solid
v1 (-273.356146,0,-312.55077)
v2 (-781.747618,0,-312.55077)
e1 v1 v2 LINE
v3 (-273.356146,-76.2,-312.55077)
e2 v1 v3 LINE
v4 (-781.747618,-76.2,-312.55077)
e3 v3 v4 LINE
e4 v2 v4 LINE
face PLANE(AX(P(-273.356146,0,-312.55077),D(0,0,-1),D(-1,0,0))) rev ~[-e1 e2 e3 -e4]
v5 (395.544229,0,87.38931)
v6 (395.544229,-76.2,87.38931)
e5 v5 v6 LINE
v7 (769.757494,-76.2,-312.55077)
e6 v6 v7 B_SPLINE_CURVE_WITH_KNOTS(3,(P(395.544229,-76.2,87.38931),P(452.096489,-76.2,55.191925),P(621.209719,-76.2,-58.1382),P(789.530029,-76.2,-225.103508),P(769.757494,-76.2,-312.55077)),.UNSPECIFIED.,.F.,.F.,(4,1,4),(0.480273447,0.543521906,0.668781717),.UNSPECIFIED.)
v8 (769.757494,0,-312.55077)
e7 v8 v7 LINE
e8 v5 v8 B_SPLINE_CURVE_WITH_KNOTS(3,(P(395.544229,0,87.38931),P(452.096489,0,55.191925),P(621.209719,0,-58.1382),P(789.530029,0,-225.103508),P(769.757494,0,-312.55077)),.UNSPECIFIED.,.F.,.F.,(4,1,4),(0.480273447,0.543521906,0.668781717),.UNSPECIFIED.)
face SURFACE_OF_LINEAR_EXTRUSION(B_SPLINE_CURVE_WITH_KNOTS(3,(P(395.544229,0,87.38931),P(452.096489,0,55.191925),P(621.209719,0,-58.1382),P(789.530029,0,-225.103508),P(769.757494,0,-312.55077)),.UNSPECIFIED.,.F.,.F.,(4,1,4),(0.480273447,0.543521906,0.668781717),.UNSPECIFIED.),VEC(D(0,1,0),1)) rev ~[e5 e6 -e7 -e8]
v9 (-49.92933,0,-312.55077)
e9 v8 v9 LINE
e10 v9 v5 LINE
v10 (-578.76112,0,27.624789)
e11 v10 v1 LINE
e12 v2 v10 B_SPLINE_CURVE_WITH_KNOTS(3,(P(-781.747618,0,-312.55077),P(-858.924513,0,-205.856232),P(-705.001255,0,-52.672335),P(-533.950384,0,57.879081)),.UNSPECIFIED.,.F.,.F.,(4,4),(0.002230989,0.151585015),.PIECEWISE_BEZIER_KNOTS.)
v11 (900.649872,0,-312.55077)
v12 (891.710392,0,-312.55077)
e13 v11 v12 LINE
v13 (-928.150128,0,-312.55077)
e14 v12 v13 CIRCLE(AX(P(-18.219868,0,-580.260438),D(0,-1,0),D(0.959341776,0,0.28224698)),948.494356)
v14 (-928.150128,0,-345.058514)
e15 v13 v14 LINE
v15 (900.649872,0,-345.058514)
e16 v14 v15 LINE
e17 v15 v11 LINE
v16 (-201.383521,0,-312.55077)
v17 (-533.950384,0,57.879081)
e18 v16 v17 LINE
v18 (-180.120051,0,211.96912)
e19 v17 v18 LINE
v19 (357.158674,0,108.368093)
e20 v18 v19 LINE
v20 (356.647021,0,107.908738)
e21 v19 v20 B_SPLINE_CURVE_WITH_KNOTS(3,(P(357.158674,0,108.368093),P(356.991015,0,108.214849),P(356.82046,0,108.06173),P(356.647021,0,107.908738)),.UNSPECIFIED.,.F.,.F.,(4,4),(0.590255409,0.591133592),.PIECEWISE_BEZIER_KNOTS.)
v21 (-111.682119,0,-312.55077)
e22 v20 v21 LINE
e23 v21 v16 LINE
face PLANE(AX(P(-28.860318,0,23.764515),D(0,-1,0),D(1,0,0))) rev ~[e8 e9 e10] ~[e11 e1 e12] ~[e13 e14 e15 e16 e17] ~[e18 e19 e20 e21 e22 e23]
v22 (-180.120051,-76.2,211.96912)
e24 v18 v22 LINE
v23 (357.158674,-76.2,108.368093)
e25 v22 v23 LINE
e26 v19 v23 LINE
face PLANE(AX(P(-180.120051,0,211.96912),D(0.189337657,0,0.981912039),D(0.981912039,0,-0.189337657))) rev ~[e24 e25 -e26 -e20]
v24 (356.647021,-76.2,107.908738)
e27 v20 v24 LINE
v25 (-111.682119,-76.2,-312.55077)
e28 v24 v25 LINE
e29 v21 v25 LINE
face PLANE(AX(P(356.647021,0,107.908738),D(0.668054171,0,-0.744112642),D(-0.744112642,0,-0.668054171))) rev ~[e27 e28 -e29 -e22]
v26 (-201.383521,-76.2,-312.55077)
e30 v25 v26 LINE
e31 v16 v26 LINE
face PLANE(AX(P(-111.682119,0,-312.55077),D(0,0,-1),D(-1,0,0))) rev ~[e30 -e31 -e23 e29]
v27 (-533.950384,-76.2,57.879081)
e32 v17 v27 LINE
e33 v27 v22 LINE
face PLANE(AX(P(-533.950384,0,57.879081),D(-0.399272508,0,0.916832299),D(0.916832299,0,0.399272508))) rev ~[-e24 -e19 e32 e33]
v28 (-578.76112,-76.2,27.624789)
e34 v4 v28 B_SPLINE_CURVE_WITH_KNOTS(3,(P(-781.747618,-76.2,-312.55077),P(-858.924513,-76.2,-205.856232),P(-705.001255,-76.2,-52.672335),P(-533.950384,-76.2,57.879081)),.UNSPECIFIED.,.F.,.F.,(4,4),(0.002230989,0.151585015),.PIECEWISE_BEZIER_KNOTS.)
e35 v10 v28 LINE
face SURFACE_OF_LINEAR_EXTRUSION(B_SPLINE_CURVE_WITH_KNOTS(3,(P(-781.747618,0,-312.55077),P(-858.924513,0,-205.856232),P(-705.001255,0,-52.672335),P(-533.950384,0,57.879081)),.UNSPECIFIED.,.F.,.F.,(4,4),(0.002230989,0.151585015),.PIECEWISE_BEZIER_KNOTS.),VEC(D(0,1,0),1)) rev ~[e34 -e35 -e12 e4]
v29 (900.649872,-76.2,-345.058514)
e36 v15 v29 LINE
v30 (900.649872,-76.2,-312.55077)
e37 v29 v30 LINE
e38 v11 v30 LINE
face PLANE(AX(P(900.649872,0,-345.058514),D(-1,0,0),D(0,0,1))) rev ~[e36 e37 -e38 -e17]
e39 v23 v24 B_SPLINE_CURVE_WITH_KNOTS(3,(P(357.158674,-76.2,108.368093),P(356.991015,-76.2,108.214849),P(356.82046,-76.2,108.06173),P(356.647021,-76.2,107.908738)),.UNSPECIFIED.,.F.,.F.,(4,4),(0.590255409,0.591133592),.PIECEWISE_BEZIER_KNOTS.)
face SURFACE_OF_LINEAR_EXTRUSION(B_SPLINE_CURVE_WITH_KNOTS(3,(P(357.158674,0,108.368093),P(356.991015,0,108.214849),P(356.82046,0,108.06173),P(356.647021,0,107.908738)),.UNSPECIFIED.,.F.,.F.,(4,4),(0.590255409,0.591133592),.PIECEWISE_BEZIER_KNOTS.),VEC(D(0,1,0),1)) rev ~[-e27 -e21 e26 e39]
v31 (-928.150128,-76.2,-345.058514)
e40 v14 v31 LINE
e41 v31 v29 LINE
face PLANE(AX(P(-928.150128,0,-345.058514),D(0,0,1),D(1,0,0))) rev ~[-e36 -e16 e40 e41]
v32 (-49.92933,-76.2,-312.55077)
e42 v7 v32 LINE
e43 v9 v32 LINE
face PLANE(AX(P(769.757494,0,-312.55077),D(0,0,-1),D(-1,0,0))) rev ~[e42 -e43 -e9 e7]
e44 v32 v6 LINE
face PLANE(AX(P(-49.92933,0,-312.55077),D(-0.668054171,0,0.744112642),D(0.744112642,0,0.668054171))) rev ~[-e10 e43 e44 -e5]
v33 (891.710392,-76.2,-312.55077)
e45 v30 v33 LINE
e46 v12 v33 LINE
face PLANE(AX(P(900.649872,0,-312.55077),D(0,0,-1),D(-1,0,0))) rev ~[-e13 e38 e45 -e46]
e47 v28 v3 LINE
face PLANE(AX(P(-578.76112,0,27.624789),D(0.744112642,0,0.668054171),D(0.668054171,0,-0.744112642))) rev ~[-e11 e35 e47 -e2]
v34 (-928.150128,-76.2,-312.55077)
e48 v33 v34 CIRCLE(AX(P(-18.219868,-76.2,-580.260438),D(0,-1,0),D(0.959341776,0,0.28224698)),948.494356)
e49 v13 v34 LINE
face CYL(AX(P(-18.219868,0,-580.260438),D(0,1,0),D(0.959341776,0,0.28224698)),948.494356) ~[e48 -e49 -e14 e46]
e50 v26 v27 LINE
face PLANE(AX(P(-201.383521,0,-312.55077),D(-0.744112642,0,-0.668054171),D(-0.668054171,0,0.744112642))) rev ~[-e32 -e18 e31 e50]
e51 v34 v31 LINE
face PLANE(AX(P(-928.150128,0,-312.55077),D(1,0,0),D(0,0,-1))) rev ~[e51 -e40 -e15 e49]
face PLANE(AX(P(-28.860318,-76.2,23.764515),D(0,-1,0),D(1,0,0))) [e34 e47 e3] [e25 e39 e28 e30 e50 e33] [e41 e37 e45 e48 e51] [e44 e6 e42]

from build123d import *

# Parameters (mm, degrees)
F1_DEPTH = 76.2


with BuildPart() as f1:
    # F0 (on Front) → F1 (new body)
    with BuildSketch(Plane.XZ):
        with BuildLine():
            Line((900.6498717056, -312.5507702395), (891.7103917568, -312.5507702395))
            ThreePointArc((891.7103917568, -312.5507702395), (-18.2198682688, 368.2339185386), (-928.1501282944, -312.5507702395))
            Line((-928.1501282944, -312.5507702395), (-928.1501282944, -345.05851352))
            Line((-928.1501282944, -345.05851352), (-749.2538985146, -345.05851352))
            add(Edge.make_bspline(
                [(-749.2538985146, -345.0585135201), (-760.7342074403, -336.2080146902), (-770.4190479747, -326.955384148), (-778.1336966335, -317.3006312947)],
                knots=[0.9863041687, 0.9863041687, 0.9863041687, 0.9863041687, 1, 1, 1, 1], degree=3))
            add(Edge.make_bspline(
                [(-778.1336966335, -317.3006312947), (-779.3903781429, -315.7279155528), (-780.5947807249, -314.1445295186), (-781.7476175602, -312.5507702395)],
                knots=[0, 0, 0, 0, 0.0022309892, 0.0022309892, 0.0022309892, 0.0022309892], degree=3))
            add(Edge.make_bspline(
                [(-781.7476175602, -312.5507702395), (-852.1024790666, -215.2874716318), (-730.4075461351, -79.390396257), (-578.7611195863, 27.6247892302)],
                knots=[0.0022309892, 0.0022309892, 0.0022309892, 0.0022309892, 0.1383828997, 0.1383828997, 0.1383828997, 0.1383828997], degree=3))
            add(Edge.make_bspline(
                [(-578.7611195863, 27.6247892302), (-564.0565616619, 38.0016311354), (-549.0703872563, 48.1069134214), (-533.9503839152, 57.8790810031)],
                knots=[0.1383828997, 0.1383828997, 0.1383828997, 0.1383828997, 0.1515850153, 0.1515850153, 0.1515850153, 0.1515850153], degree=3))
            add(Edge.make_bspline(
                [(-533.9503839241, 57.8790809984), (-602.4722852405, 100.7350307252), (-409.6251199582, 190.8667602879), (-180.120050854, 211.9691197295)],
                knots=[0, 0, 0, 0, 0.2694339971, 0.2694339971, 0.2694339971, 0.2694339971], degree=3))
            add(Edge.make_bspline(
                [(-180.1200508538, 211.9691197281), (-93.8173354063, 228.6015651353), (-14.6508277799, 226.1155115237), (65.4117966901, 211.4804253565)],
                knots=[0.2631178936, 0.2631178936, 0.2631178936, 0.2631178936, 0.3555862093, 0.3555862093, 0.3555862093, 0.3555862093], degree=3))
            add(Edge.make_bspline(
                [(65.4117966901, 211.4804253565), (252.144781627, 195.4027277771), (400.2346102312, 147.7404794914), (357.158674228, 108.3680934352)],
                knots=[0.3646274658, 0.3646274658, 0.3646274658, 0.3646274658, 0.5902554086, 0.5902554086, 0.5902554086, 0.5902554086], degree=3))
            add(Edge.make_bspline(
                [(357.1586742266, 108.3680934339), (369.9420280531, 101.672338017), (382.7382890401, 94.6802256262), (395.5442289819, 87.3893097061)],
                knots=[0.4659511905, 0.4659511905, 0.4659511905, 0.4659511905, 0.4802734469, 0.4802734469, 0.4802734469, 0.4802734469], degree=3))
            add(Edge.make_bspline(
                [(395.5442289819, 87.3893097061), (452.0964892557, 55.1919250067), (621.2097193886, -58.1382004272), (789.5300294959, -225.1035077486), (769.7574939756, -312.5507702395)],
                knots=[0.4802734469, 0.4802734469, 0.4802734469, 0.4802734469, 0.5435219059, 0.668781717, 0.668781717, 0.668781717, 0.668781717], degree=3))
            add(Edge.make_bspline(
                [(769.7574939756, -312.5507702395), (767.2117421615, -323.809772753), (762.4841536184, -334.6792525956), (755.294559917, -345.05851352)],
                knots=[0.668781717, 0.668781717, 0.668781717, 0.668781717, 0.6849091576, 0.6849091576, 0.6849091576, 0.6849091576], degree=3))
            Line((755.2945599171, -345.05851352), (900.6498717056, -345.05851352))
            Line((900.6498717056, -345.05851352), (900.6498717056, -312.5507702395))
        make_face()
        with BuildLine():
            add(Edge.make_bspline(
                [(-749.2538985146, -345.0585135201), (-760.7342074403, -336.2080146902), (-770.4190479747, -326.955384148), (-778.1336966335, -317.3006312947)],
                knots=[0.9863041687, 0.9863041687, 0.9863041687, 0.9863041687, 1, 1, 1, 1], degree=3))
            Line((-749.2538985146, -345.05851352), (755.2945599171, -345.05851352))
            add(Edge.make_bspline(
                [(769.7574939756, -312.5507702395), (767.2117421615, -323.809772753), (762.4841536184, -334.6792525956), (755.294559917, -345.05851352)],
                knots=[0.668781717, 0.668781717, 0.668781717, 0.668781717, 0.6849091576, 0.6849091576, 0.6849091576, 0.6849091576], degree=3))
            Line((769.7574939756, -312.5507702395), (-49.9293302995, -312.5507702395))
            Line((-49.9293302995, -312.5507702395), (395.5442289819, 87.3893097061))
            add(Edge.make_bspline(
                [(357.1586742266, 108.3680934339), (369.9420280531, 101.672338017), (382.7382890401, 94.6802256262), (395.5442289819, 87.3893097061)],
                knots=[0.4659511905, 0.4659511905, 0.4659511905, 0.4659511905, 0.4802734469, 0.4802734469, 0.4802734469, 0.4802734469], degree=3))
            add(Edge.make_bspline(
                [(357.158674228, 108.3680934352), (356.9910150595, 108.2148491387), (356.8204599128, 108.0617304257), (356.6470209458, 107.9087381034)],
                knots=[0.5902554086, 0.5902554086, 0.5902554086, 0.5902554086, 0.5911335925, 0.5911335925, 0.5911335925, 0.5911335925], degree=3))
            Line((356.6470209458, 107.9087381034), (-111.6821191112, -312.5507702395))
            Line((-111.6821191112, -312.5507702395), (-201.3835205481, -312.5507702395))
            Line((-201.3835205481, -312.5507702395), (-533.9503839109, 57.8790810059))
            add(Edge.make_bspline(
                [(-578.7611195863, 27.6247892302), (-564.0565616619, 38.0016311354), (-549.0703872563, 48.1069134214), (-533.9503839152, 57.8790810031)],
                knots=[0.1383828997, 0.1383828997, 0.1383828997, 0.1383828997, 0.1515850153, 0.1515850153, 0.1515850153, 0.1515850153], degree=3))
            Line((-578.7611195863, 27.6247892302), (-273.35614635, -312.5507702395))
            Line((-273.35614635, -312.5507702395), (-781.7476175602, -312.5507702395))
            add(Edge.make_bspline(
                [(-778.1336966335, -317.3006312947), (-779.3903781429, -315.7279155528), (-780.5947807249, -314.1445295186), (-781.7476175602, -312.5507702395)],
                knots=[0, 0, 0, 0, 0.0022309892, 0.0022309892, 0.0022309892, 0.0022309892], degree=3))
        make_face()
        with BuildLine():
            Line((-180.120050854, 211.9691197295), (357.1586742266, 108.3680934339))
            add(Edge.make_bspline(
                [(65.4117966901, 211.4804253565), (71.5175240267, 210.3643259746), (167.1573362354, 191.7908820713), (264.946329488, 156.6677270957), (357.1586742266, 108.3680934339)],
                knots=[0.3555862093, 0.3555862093, 0.3555862093, 0.3555862093, 0.3626380181, 0.4659511905, 0.4659511905, 0.4659511905, 0.4659511905], degree=3))
            add(Edge.make_bspline(
                [(-180.120050854, 211.9691197295), (-99.0338336855, 219.424774226), (-13.3717100026, 218.2636800411), (65.4117966901, 211.4804253565)],
                knots=[0.2694339971, 0.2694339971, 0.2694339971, 0.2694339971, 0.3646274658, 0.3646274658, 0.3646274658, 0.3646274658], degree=3))
        make_face()
        with BuildLine():
            add(Edge.make_bspline(
                [(65.4117966901, 211.4804253565), (71.5175240267, 210.3643259746), (167.1573362354, 191.7908820713), (264.946329488, 156.6677270957), (357.1586742266, 108.3680934339)],
                knots=[0.3555862093, 0.3555862093, 0.3555862093, 0.3555862093, 0.3626380181, 0.4659511905, 0.4659511905, 0.4659511905, 0.4659511905], degree=3))
            add(Edge.make_bspline(
                [(65.4117966901, 211.4804253565), (252.144781627, 195.4027277771), (400.2346102312, 147.7404794914), (357.158674228, 108.3680934352)],
                knots=[0.3646274658, 0.3646274658, 0.3646274658, 0.3646274658, 0.5902554086, 0.5902554086, 0.5902554086, 0.5902554086], degree=3))
        make_face()
        with BuildLine():
            add(Edge.make_bspline(
                [(-533.9503839241, 57.8790809984), (-602.4722852405, 100.7350307252), (-409.6251199582, 190.8667602879), (-180.120050854, 211.9691197295)],
                knots=[0, 0, 0, 0, 0.2694339971, 0.2694339971, 0.2694339971, 0.2694339971], degree=3))
            add(Edge.make_bspline(
                [(-533.9503839152, 57.8790810031), (-491.8326282353, 85.1000913023), (-360.9478670377, 159.8172978773), (-249.892894391, 198.5223468773), (-180.1200508538, 211.9691197281)],
                knots=[0.1515850153, 0.1515850153, 0.1515850153, 0.1515850153, 0.1883603696, 0.2631178936, 0.2631178936, 0.2631178936, 0.2631178936], degree=3))
        make_face()
        with BuildLine():
            add(Edge.make_bspline(
                [(-533.9503839152, 57.8790810031), (-491.8326282353, 85.1000913023), (-360.9478670377, 159.8172978773), (-249.892894391, 198.5223468773), (-180.1200508538, 211.9691197281)],
                knots=[0.1515850153, 0.1515850153, 0.1515850153, 0.1515850153, 0.1883603696, 0.2631178936, 0.2631178936, 0.2631178936, 0.2631178936], degree=3))
            Line((-533.9503839109, 57.8790810059), (-180.120050854, 211.9691197295))
        make_face()
        with BuildLine():
            add(Edge.make_bspline(
                [(-180.120050854, 211.9691197295), (-99.0338336855, 219.424774226), (-13.3717100026, 218.2636800411), (65.4117966901, 211.4804253565)],
                knots=[0.2694339971, 0.2694339971, 0.2694339971, 0.2694339971, 0.3646274658, 0.3646274658, 0.3646274658, 0.3646274658], degree=3))
            add(Edge.make_bspline(
                [(-180.1200508538, 211.9691197281), (-93.8173354063, 228.6015651353), (-14.6508277799, 226.1155115237), (65.4117966901, 211.4804253565)],
                knots=[0.2631178936, 0.2631178936, 0.2631178936, 0.2631178936, 0.3555862093, 0.3555862093, 0.3555862093, 0.3555862093], degree=3))
        make_face()
    extrude(amount=F1_DEPTH)


solid = f1.part
